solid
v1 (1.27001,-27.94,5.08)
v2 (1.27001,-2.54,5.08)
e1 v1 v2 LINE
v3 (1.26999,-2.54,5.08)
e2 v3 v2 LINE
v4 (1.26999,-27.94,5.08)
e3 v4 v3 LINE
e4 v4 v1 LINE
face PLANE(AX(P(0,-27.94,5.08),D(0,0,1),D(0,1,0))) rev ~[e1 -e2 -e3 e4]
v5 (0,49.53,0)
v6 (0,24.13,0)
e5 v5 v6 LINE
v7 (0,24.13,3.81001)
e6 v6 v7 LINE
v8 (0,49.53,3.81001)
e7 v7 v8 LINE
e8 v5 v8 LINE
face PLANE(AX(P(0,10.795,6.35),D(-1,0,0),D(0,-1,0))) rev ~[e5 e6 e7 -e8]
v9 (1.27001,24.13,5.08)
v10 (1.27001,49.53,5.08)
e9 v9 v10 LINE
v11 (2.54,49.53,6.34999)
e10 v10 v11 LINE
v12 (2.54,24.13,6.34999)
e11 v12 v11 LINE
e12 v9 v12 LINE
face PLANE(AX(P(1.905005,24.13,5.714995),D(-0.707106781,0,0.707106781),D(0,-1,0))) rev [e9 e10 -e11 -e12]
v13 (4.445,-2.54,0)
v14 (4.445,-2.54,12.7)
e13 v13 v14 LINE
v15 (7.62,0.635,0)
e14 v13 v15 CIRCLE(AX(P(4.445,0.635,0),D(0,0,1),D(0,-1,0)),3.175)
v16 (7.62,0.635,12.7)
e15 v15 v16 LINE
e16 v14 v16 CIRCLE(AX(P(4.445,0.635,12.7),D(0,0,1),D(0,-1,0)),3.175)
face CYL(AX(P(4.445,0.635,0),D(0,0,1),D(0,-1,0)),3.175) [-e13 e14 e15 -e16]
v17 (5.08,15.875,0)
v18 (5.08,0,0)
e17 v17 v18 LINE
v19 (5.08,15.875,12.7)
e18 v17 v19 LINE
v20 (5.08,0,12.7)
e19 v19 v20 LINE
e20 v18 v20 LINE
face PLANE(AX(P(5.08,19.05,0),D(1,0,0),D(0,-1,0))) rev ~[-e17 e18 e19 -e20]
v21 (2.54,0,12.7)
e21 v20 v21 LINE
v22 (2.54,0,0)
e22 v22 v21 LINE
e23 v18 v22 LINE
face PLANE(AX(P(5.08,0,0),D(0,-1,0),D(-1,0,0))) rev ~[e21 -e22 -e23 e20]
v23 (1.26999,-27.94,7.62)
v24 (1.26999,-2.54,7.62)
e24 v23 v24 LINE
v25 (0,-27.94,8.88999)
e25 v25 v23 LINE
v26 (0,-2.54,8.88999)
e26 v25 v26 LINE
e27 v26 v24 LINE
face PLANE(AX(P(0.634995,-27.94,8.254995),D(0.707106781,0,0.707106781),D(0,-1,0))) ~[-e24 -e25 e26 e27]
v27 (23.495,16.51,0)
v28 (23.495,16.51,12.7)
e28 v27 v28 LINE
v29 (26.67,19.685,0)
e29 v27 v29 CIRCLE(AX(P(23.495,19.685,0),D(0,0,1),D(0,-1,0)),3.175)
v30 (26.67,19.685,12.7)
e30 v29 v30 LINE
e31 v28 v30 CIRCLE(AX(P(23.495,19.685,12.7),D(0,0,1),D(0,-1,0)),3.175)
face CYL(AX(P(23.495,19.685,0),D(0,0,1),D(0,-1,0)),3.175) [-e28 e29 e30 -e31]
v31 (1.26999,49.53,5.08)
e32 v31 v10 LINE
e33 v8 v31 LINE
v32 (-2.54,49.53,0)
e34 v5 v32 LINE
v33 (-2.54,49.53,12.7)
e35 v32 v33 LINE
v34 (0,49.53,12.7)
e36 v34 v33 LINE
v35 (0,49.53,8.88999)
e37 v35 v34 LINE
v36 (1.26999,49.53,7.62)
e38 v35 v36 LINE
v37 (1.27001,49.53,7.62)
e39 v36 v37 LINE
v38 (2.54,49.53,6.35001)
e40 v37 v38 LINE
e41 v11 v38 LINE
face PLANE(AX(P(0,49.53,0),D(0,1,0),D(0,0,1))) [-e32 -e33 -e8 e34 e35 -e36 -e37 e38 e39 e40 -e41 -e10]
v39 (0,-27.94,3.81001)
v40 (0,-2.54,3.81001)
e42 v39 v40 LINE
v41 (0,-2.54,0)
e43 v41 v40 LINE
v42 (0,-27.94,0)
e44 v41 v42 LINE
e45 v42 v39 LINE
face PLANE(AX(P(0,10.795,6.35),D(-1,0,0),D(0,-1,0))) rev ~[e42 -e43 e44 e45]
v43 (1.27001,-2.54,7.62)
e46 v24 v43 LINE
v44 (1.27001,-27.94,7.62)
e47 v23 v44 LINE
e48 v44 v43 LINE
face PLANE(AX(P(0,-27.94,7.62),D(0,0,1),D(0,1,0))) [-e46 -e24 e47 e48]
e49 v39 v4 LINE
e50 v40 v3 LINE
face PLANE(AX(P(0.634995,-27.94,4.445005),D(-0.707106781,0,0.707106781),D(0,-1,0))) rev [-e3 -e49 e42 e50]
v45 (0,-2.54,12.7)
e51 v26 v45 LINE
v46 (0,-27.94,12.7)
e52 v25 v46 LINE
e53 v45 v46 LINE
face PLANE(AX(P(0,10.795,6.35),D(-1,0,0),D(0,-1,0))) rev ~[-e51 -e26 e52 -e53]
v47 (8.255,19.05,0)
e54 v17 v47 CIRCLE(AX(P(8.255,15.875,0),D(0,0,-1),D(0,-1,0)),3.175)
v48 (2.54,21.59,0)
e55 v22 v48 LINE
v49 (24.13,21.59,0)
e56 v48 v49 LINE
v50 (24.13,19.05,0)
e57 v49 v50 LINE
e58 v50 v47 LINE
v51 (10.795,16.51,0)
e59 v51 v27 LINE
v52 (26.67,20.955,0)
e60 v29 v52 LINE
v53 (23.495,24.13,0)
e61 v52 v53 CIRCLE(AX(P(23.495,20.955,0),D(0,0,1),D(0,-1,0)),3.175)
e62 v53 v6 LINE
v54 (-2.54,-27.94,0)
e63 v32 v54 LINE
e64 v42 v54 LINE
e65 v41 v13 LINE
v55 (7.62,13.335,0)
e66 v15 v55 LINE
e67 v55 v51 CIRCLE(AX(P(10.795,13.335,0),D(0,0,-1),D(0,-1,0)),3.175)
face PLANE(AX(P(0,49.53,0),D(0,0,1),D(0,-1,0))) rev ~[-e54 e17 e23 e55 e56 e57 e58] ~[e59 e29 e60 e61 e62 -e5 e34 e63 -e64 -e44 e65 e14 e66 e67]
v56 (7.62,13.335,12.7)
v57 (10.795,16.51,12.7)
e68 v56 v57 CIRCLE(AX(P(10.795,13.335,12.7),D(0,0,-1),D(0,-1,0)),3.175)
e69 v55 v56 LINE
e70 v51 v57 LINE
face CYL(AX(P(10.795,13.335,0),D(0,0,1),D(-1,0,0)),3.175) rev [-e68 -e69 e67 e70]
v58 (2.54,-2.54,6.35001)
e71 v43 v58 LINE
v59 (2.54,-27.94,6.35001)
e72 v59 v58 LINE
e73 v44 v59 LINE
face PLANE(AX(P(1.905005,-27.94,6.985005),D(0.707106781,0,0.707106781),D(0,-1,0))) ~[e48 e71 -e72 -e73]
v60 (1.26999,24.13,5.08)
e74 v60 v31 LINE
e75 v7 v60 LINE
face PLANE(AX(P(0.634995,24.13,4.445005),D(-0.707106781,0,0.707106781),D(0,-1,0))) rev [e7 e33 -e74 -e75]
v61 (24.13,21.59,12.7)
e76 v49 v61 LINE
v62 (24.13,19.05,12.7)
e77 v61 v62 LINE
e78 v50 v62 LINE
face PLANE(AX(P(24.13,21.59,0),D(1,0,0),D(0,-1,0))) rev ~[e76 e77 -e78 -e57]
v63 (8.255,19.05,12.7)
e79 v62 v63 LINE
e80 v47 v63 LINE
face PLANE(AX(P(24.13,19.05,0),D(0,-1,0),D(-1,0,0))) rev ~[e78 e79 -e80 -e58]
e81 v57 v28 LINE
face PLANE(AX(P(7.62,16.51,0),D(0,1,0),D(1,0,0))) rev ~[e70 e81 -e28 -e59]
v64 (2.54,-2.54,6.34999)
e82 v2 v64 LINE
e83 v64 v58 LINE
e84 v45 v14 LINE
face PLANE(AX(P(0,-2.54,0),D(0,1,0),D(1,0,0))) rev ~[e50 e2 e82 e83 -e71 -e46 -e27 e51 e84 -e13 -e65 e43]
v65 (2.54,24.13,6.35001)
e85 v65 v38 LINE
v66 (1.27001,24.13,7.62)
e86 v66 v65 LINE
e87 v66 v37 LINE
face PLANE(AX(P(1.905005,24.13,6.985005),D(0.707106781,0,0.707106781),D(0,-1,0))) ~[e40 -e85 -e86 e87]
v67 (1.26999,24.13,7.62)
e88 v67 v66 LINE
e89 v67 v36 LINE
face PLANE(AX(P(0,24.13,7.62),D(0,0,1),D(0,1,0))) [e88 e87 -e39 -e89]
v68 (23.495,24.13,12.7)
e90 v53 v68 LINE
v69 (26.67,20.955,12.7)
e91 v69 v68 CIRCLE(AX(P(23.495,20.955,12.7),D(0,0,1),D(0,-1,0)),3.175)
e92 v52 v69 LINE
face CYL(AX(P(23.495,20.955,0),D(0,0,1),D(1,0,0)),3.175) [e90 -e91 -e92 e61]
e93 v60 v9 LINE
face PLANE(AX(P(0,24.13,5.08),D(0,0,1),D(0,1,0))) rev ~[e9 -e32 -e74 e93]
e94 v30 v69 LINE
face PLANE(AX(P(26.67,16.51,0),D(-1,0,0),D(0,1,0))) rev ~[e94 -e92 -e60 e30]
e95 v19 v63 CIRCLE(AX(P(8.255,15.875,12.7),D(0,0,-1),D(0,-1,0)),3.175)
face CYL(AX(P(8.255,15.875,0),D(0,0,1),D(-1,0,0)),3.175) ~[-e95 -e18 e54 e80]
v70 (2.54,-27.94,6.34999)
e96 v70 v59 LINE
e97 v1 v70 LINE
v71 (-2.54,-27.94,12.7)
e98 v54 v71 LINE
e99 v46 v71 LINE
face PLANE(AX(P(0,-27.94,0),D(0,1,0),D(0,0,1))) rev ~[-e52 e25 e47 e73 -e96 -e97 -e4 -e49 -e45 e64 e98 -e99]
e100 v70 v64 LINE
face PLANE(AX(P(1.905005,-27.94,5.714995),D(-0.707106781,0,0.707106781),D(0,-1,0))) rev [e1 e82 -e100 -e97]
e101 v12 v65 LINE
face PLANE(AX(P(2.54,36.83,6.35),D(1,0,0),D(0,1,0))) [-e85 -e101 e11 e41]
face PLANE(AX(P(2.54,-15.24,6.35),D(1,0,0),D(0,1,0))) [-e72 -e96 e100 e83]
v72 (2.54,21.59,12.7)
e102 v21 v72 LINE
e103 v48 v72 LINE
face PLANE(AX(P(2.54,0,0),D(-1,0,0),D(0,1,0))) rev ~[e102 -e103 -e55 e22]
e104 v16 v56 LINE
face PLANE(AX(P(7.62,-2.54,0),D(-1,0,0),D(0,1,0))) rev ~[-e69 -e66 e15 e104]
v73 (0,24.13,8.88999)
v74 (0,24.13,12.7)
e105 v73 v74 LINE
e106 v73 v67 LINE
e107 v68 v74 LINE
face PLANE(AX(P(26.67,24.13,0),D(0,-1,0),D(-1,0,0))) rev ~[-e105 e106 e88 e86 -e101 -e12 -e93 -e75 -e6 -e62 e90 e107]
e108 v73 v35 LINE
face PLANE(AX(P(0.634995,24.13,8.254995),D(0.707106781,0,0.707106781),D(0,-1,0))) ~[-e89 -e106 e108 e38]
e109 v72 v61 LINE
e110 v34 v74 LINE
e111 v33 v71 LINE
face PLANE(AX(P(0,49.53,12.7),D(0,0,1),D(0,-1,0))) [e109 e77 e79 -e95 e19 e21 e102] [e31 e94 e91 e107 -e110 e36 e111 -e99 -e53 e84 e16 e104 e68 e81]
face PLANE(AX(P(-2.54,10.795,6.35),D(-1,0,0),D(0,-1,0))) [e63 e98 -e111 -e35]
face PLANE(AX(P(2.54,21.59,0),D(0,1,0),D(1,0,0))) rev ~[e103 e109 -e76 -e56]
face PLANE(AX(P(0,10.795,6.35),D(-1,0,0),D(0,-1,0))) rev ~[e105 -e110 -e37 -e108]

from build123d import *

# Parameters (mm, degrees)
F1_DEPTH = 12.7
F2_R     = 3.175
F3_W     = 77.47
F3_H     = 12.7
F4_DEPTH = 2.54
F5_W     = 25.4
F5_H     = 2.54
F6_DEPTH = 2.54
F7_SIZE  = 1.26999


# Not quite as in the source:
# - a fillet or chamfer is up to 0.001 mm smaller than in the source, because OpenCascade refuses the exact size


with BuildPart() as f1:
    # F0 (on Top) → F1 (new body)
    with BuildSketch(Plane.XY):
        Polygon((0, 24.13), (0, -2.1948770154), (0, -2.54), (7.62, -2.54), (7.62, 16.51), (26.67, 16.51), (26.67, 24.13), align=None)
        Polygon((5.08, 0), (2.54, 0), (2.54, 21.59), (5.08, 21.59), (24.13, 21.59), (24.13, 19.05), (5.08, 19.05), align=None, mode=Mode.SUBTRACT)
    extrude(amount=F1_DEPTH)

    # F2
    f2_edges = [f1.edges().sort_by_distance(p)[0] for p in [
        (26.67, 24.13, 6.35),
        (26.67, 16.51, 6.35),
        (5.08, 19.05, 6.35),
        (7.62, -2.54, 6.35),
        (7.62, 16.51, 6.35),
    ]]
    fillet(f2_edges, radius=F2_R)

    # F3 (on face) → F4 (join)
    with BuildSketch(Plane(origin=(0, 0, 0), x_dir=(0, -1, 0), z_dir=(-1, 0, 0))):
        with Locations((-10.795, 6.35)):
            Rectangle(F3_W, F3_H)
    extrude(amount=F4_DEPTH)

    # F5 (on face) → F6 (join)
    with BuildSketch(Plane.YZ):
        with Locations((36.83, 6.35)):
            Rectangle(F5_W, F5_H)
        with Locations((-15.24, 6.35)):
            Rectangle(F5_W, F5_H)
    extrude(amount=F6_DEPTH)

    # F7 (size 1.27 in the source; OpenCascade refuses exactly that, so slightly less here)
    f7_edges = [f1.edges().sort_by_distance(p)[0] for p in [
        (2.54, -15.24, 5.08),
        (2.54, -15.24, 7.62),
        (2.54, 36.83, 7.62),
        (2.54, 36.83, 5.08),
        (0, -15.24, 5.08),
        (0, -15.24, 7.62),
        (0, 36.83, 7.62),
        (0, 36.83, 5.08),
    ]]
    chamfer(f7_edges, length=F7_SIZE)


solid = f1.part
